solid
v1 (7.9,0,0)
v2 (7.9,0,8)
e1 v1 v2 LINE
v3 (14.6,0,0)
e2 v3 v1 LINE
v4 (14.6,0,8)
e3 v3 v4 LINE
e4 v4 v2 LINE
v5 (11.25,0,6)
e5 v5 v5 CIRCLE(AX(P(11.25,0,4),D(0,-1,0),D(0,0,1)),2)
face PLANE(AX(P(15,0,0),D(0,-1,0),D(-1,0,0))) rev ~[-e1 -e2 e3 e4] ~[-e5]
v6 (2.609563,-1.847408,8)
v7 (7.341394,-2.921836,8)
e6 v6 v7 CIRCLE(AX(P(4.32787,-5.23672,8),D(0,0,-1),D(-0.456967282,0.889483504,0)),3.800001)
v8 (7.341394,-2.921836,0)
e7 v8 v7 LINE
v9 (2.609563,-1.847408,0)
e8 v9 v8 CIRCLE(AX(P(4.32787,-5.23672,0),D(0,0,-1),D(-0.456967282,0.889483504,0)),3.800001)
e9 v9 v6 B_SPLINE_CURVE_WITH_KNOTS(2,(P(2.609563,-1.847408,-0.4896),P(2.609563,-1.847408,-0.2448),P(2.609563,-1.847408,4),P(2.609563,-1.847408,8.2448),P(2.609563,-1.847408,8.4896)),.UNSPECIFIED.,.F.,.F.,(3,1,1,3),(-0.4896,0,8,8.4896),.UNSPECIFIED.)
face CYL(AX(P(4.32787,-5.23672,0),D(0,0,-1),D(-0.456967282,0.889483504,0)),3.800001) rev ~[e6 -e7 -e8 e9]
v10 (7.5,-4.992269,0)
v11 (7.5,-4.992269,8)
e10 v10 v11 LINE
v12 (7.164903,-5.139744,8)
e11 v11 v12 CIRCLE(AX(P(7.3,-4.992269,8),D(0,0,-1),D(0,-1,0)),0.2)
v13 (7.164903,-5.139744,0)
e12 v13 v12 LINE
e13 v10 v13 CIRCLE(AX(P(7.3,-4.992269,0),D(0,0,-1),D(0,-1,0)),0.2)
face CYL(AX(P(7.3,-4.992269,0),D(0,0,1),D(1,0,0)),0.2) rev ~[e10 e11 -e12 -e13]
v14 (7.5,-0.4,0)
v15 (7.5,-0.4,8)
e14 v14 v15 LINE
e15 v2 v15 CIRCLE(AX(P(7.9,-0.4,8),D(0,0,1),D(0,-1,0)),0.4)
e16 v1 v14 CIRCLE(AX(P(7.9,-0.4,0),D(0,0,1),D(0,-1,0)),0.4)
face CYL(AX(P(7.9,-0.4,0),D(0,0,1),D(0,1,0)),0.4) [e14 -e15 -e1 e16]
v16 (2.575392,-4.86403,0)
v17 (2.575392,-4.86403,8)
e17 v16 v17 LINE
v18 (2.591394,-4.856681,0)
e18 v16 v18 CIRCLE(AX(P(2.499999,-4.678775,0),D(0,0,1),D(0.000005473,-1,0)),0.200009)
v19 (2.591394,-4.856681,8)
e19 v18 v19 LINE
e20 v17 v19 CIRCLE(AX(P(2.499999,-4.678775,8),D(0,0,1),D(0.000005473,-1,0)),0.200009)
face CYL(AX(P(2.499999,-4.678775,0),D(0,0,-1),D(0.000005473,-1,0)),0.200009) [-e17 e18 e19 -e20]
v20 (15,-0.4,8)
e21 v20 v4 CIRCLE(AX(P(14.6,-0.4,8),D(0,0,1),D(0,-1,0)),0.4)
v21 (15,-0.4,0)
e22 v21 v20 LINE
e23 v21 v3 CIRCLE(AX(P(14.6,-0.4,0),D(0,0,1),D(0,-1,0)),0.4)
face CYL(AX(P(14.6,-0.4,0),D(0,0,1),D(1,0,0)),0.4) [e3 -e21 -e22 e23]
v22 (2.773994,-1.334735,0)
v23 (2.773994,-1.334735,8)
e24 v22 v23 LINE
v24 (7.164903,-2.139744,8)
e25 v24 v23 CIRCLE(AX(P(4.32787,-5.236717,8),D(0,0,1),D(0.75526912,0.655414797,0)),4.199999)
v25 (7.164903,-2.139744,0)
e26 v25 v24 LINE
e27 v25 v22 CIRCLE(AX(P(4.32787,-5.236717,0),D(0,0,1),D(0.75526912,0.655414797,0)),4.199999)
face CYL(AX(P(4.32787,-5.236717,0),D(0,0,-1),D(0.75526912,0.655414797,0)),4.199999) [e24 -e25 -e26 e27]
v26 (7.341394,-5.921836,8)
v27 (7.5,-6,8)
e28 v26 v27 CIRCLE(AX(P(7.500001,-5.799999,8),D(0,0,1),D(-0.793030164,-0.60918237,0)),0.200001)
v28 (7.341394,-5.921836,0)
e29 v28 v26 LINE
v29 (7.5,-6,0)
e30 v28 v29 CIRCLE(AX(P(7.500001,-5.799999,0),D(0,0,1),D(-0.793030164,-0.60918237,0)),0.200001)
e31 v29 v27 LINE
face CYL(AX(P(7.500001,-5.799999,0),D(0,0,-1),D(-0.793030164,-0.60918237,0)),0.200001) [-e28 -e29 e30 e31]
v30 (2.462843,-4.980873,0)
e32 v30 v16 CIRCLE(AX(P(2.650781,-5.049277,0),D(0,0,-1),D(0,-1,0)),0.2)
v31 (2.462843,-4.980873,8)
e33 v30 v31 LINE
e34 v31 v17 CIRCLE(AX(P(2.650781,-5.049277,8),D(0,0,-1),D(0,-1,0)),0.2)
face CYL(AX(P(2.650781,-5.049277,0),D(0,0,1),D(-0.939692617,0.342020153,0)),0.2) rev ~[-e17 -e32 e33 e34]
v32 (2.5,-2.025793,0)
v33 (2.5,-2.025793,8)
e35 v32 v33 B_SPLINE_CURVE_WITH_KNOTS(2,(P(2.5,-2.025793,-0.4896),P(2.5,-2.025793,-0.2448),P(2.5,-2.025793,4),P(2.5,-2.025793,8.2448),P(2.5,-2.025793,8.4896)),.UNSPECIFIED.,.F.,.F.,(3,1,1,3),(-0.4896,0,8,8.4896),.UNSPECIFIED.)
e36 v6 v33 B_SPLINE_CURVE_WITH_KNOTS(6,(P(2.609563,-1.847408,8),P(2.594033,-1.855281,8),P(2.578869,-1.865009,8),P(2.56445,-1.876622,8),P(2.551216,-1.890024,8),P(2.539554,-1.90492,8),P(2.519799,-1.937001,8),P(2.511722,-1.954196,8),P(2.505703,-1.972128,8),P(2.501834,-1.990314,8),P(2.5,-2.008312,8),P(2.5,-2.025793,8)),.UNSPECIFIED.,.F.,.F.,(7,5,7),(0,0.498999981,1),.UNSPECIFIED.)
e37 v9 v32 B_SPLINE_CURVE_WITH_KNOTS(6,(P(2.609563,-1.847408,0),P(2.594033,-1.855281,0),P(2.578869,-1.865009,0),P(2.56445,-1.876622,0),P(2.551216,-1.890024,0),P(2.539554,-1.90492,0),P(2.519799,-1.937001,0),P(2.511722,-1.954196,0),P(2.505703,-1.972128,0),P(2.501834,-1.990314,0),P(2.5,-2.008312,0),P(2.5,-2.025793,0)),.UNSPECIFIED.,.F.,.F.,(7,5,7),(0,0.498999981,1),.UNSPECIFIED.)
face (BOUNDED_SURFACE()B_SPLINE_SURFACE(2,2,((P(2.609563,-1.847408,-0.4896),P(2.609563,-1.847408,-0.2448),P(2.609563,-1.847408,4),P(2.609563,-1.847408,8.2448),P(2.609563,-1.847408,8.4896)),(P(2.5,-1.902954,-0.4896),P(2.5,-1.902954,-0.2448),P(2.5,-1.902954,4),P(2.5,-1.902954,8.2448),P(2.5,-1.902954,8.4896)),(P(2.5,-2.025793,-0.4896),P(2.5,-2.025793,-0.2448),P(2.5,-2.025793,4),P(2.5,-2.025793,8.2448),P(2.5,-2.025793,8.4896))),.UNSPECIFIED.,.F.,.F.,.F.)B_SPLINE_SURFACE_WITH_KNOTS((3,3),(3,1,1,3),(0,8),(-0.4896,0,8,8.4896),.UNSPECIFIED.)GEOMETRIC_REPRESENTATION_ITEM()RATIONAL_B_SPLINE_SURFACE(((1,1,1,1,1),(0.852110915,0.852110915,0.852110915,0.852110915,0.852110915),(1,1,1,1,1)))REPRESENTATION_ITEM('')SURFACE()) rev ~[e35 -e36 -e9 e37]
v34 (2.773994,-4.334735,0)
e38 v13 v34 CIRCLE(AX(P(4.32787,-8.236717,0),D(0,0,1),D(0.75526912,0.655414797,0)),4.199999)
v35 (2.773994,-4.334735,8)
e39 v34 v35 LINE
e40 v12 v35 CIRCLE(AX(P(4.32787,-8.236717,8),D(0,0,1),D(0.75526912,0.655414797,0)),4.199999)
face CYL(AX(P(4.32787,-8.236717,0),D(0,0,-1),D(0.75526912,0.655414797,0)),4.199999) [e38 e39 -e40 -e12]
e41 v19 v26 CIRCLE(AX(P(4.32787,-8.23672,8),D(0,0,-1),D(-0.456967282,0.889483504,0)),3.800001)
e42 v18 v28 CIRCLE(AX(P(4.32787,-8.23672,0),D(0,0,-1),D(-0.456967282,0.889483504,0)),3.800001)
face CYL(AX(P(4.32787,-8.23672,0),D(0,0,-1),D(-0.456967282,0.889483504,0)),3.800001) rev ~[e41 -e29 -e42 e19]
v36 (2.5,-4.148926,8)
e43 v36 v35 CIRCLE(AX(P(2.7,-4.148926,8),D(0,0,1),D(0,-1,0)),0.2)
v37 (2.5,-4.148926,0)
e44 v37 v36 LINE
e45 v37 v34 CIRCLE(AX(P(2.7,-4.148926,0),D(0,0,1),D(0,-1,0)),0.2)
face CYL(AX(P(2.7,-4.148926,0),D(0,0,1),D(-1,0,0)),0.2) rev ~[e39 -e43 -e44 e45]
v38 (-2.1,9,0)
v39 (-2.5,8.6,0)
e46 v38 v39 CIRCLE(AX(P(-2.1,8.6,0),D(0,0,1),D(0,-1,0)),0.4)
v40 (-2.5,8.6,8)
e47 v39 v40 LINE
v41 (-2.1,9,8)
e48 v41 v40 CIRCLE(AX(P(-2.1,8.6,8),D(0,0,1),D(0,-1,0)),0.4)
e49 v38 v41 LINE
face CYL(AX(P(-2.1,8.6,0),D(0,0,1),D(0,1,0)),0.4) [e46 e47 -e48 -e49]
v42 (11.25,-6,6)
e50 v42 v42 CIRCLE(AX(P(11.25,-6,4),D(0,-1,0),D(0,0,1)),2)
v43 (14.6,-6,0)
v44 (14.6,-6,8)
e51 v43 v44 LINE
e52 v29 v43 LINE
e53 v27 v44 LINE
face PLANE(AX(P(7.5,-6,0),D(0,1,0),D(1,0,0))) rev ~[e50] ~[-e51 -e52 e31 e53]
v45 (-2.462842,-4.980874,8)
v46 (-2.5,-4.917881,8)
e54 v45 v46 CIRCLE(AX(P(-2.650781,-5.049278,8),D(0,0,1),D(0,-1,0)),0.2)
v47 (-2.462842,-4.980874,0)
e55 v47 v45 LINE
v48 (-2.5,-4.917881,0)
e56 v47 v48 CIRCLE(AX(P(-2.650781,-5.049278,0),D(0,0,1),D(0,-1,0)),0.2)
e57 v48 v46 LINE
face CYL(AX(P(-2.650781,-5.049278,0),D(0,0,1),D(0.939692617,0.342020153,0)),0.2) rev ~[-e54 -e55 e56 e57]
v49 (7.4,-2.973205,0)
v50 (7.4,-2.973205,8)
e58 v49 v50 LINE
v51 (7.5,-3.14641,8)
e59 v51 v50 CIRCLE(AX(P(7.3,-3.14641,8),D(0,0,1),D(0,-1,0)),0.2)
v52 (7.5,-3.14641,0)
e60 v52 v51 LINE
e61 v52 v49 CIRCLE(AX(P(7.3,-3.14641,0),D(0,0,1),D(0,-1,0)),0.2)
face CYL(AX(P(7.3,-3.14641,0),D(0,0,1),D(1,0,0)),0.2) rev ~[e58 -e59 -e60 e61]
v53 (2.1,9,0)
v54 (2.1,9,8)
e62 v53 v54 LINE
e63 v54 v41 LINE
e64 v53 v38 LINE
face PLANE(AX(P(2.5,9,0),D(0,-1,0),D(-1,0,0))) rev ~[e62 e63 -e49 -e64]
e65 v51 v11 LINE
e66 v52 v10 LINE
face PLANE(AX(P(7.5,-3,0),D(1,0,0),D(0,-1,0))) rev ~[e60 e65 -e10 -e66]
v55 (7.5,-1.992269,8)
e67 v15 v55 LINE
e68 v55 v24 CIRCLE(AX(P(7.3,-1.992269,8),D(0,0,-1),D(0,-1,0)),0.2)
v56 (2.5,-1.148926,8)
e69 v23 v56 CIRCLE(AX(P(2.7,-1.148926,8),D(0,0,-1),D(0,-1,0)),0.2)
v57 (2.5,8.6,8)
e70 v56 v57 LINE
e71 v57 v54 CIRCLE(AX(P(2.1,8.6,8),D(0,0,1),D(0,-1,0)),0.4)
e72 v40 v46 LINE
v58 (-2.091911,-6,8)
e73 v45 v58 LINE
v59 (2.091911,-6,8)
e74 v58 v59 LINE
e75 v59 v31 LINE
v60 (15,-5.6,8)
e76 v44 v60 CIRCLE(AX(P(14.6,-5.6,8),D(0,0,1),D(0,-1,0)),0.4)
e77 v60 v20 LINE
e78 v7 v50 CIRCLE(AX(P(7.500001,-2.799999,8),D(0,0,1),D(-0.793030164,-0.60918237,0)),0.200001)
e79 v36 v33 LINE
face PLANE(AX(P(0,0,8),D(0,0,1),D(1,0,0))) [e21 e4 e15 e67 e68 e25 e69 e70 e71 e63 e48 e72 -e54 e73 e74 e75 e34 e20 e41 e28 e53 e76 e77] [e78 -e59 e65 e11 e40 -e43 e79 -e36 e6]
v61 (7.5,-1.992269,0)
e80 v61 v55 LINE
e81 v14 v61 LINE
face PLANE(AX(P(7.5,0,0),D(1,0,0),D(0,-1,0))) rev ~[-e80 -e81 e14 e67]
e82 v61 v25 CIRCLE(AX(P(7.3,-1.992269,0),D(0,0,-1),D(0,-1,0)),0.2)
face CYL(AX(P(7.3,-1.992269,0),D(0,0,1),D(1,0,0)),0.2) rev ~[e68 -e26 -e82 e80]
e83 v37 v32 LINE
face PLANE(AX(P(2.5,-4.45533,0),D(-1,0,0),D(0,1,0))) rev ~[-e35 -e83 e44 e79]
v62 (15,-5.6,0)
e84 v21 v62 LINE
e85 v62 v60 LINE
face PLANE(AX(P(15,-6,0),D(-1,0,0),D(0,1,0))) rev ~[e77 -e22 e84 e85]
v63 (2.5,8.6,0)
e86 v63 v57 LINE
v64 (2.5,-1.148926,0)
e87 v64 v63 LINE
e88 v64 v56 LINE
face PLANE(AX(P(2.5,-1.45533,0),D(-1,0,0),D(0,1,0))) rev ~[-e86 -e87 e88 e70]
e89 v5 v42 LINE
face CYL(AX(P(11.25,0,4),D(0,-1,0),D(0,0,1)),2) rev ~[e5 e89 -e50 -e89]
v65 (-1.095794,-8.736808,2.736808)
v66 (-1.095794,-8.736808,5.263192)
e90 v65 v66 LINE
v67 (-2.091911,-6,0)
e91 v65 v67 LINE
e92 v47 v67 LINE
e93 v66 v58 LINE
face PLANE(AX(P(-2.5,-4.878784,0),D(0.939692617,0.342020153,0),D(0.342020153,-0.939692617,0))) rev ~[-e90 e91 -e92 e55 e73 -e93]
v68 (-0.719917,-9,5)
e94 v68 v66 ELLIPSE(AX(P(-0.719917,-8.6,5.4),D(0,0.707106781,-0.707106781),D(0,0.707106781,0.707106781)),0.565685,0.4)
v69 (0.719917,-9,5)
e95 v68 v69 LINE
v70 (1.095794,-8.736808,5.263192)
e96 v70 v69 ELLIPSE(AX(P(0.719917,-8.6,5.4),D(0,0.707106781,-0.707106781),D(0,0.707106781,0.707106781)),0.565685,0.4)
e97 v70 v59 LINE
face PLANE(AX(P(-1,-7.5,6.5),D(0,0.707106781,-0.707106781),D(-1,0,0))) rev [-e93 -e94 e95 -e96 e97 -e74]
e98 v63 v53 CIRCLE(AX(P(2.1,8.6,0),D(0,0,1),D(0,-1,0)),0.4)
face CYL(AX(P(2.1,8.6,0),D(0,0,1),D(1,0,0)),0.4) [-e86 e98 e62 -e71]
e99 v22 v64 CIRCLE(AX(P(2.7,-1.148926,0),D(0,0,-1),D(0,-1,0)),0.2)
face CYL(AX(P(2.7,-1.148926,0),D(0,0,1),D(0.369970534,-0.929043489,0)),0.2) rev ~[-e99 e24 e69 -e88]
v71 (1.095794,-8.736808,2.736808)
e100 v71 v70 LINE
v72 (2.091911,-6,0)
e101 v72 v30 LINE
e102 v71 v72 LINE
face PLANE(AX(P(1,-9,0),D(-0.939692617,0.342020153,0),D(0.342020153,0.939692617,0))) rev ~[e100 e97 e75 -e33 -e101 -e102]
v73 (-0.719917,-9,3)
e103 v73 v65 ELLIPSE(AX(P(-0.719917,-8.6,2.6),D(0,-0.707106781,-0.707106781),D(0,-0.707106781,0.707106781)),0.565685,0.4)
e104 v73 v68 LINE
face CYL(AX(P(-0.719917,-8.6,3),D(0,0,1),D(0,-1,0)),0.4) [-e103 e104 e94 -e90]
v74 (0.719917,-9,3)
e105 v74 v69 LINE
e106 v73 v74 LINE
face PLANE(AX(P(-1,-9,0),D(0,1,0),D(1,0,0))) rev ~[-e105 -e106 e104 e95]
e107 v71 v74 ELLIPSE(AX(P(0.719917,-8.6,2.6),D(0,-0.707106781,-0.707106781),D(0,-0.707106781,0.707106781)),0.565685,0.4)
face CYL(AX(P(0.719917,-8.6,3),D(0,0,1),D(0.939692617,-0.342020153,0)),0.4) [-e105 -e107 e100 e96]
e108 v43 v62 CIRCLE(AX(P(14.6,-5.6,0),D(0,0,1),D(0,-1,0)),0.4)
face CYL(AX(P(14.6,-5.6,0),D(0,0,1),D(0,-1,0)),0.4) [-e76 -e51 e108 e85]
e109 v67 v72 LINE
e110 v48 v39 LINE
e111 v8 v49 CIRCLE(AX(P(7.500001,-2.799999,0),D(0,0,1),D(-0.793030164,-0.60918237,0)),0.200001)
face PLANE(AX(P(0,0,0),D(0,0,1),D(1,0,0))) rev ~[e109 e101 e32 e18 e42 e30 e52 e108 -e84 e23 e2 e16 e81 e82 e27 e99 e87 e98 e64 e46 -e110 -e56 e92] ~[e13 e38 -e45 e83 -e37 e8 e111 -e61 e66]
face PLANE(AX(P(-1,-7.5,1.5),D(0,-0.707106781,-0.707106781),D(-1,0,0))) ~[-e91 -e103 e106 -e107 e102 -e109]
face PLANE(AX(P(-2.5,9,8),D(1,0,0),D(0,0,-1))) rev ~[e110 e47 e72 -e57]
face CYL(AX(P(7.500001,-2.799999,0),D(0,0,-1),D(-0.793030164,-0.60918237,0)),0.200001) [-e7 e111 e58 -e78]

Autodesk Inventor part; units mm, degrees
ref_plane "YZ Plane" through (0, 0, 0) normal (1, 0, 0) x (0, 1, 0)
ref_plane "XZ Plane" through (0, 0, 0) normal (0, 1, 0) x (-1, 0, 0)
ref_plane "XY Plane" through (0, 0, 0) normal (0, 0, 1) x (1, 0, 0)
sketch "Sketch1" plane through (0, 0, 0) normal (0, 0, 1) x (1, 0, 0)
  line L0 (-2.5, 9) -> (2.5, 9)
  line L1 (2.5, 9) -> (2.5, -9)
  line L2 (2.5, -9) -> (-2.5, -9)
  line L3 (-2.5, -9) -> (-2.5, 9)
  line L4 (-2.5, 9) -> (2.5, -9) construction
  line L5 (2.5, 9) -> (-2.5, -9) construction
  line L6 (-15, 0) -> (-7.5, 0)
  line L7 (-7.5, 0) -> (-7.5, -3)
  line L8 (-7.5, -3) -> (-15, -3)
  line L9 (-15, -3) -> (-15, 0)
  line L10 (7.5, 0) -> (15, 0)
  line L11 (15, 0) -> (15, -3)
  line L12 (15, -3) -> (7.5, -3)
  line L13 (7.5, -3) -> (7.5, 0)
  line L14 (7.5, -3) -> (7.5, -6)
  line L15 (7.5, -6) -> (15, -6)
  line L16 (15, -6) -> (15, -3)
  line L17 (-7.5, -3) -> (-7.5, -6)
  line L18 (-7.5, -6) -> (-15, -6)
  line L19 (-15, -6) -> (-15, -3)
  line L20 (-7.5, -1.5) -> (7.5, -1.5) construction
  line L21 (-1, -9) -> (-2.5, -4.878784)
  line L22 (1, -9) -> (2.5, -4.878784)
  arc A0 (-2.5, -4.678784) -> (-7.5, -5.8) centre (-4.32787, -8.236717) ccw construction
  arc A1 (-2.408606, -4.500887) -> (-7.658606, -5.678164) centre (-4.32787, -8.236717) ccw
  arc A2 (-2.591394, -4.856681) -> (-7.341394, -5.921836) centre (-4.32787, -8.236717) ccw
  arc A3 (-2.591394, -4.856681) -> (-2.408606, -4.500887) centre (-2.5, -4.678784) ccw
  arc A4 (-7.658606, -5.678164) -> (-7.341394, -5.921836) centre (-7.5, -5.8) ccw
  arc A5 (7.5, -5.8) -> (2.5, -4.678784) centre (4.32787, -8.236717) ccw construction
  arc A6 (7.658606, -5.678164) -> (2.408606, -4.500887) centre (4.32787, -8.236717) ccw
  arc A7 (7.341394, -5.921836) -> (2.591394, -4.856681) centre (4.32787, -8.236717) ccw
  arc A8 (7.341394, -5.921836) -> (7.658606, -5.678164) centre (7.5, -5.8) ccw
  arc A9 (2.408606, -4.500887) -> (2.591394, -4.856681) centre (2.5, -4.678784) ccw
  arc A10 (-2.5, -1.678784) -> (-7.5, -2.8) centre (-4.32787, -5.236717) ccw construction
  arc A11 (-2.408606, -1.500887) -> (-7.658606, -2.678164) centre (-4.32787, -5.236717) ccw
  arc A12 (-2.591394, -1.856681) -> (-7.341394, -2.921836) centre (-4.32787, -5.236717) ccw
  arc A13 (-2.591394, -1.856681) -> (-2.408606, -1.500887) centre (-2.5, -1.678784) ccw
  arc A14 (-7.658606, -2.678164) -> (-7.341394, -2.921836) centre (-7.5, -2.8) ccw
  arc A15 (7.5, -2.8) -> (2.5, -1.678784) centre (4.32787, -5.236717) ccw construction
  arc A16 (7.658606, -2.678164) -> (2.408606, -1.500887) centre (4.32787, -5.236717) ccw
  arc A17 (7.341394, -2.921836) -> (2.591394, -1.856681) centre (4.32787, -5.236717) ccw
  arc A18 (7.341394, -2.921836) -> (7.658606, -2.678164) centre (7.5, -2.8) ccw
  arc A19 (2.408606, -1.500887) -> (2.591394, -1.856681) centre (2.5, -1.678784) ccw
  point P0 (0, 0)
  point P1 (0, -1.5)
  point P2 (-7.5, -5.483975)
  point P3 (-2.5, -1.878784)
  point P4 (-2.5, -4.45533)
  point P5 (7.5, -5.483975)
  point P6 (2.5, -4.45533)
  point P7 (2.5, -1.878784)
  point P8 (7.5, -2.483975)
  point P9 (2.5, -1.45533)
  point P10 (-2.5, -1.45533)
  point P11 (-7.5, -2.483975)
  dimension "d0" = 5
  dimension "d1" = 18
  dimension "d2" = 30
  dimension "d3" = 3
  dimension "d4" = 3
  dimension "d5" = 5
  dimension "d8" = 9
  dimension "d9" = 3
  dimension "d10" = 2
  dimension "d11" = 20
  dimension "d12" = 0.4
  dimension "d13" = 4
  dimension "d14" = 3
sketch "Sketch1 outline for Extrusion1" plane through (0, 0, 0) normal (0, 0, 1) x (1, 0, 0)
  arc A0 (-7.5, -6) -> (-7.341394, -5.921836) centre (-7.5, -5.8) ccw
  line L0 (-15, -6) -> (-7.5, -6)
  arc A1 (-7.341394, -5.921836) -> (-2.591394, -4.856681) centre (-4.32787, -8.236717) cw
  line L1 (-15, -3) -> (-15, -6)
  arc A2 (-2.591394, -4.856681) -> (-2.5, -4.878784) centre (-2.5, -4.678784) ccw
  line L2 (-15, 0) -> (-15, -3)
  line L3 (-2.5, -4.878784) -> (-1, -9)
  line L4 (-7.5, 0) -> (-15, 0)
  line L5 (-1, -9) -> (1, -9)
  line L6 (-7.5, -2.483975) -> (-7.5, 0)
  line L7 (1, -9) -> (2.5, -4.878784)
  arc A3 (-2.5, -1.45533) -> (-7.5, -2.483975) centre (-4.32787, -5.236717) ccw
  arc A4 (2.5, -4.878784) -> (2.591394, -4.856681) centre (2.5, -4.678784) ccw
  line L8 (-2.5, 9) -> (-2.5, -1.45533)
  arc A5 (2.591394, -4.856681) -> (7.341394, -5.921836) centre (4.32787, -8.236717) cw
  line L9 (2.5, 9) -> (-2.5, 9)
  arc A6 (7.341394, -5.921836) -> (7.5, -6) centre (7.5, -5.8) ccw
  line L10 (2.5, -1.45533) -> (2.5, 9)
  line L11 (7.5, -6) -> (15, -6)
  arc A7 (7.5, -2.483975) -> (2.5, -1.45533) centre (4.32787, -5.236717) ccw
  line L12 (15, -6) -> (15, -3)
  line L13 (7.5, 0) -> (7.5, -2.483975)
  line L14 (15, -3) -> (15, 0)
  line L15 (15, 0) -> (7.5, 0)
  line L16 (-7.5, -5.483975) -> (-7.5, -3)
  arc A8 (-2.5, -4.45533) -> (-7.5, -5.483975) centre (-4.32787, -8.236717) ccw
  line L17 (-2.5, -1.878784) -> (-2.5, -4.45533)
  arc A9 (-2.591394, -1.856681) -> (-2.5, -1.878784) centre (-2.5, -1.678784) ccw
  arc A10 (-7.341394, -2.921836) -> (-2.591394, -1.856681) centre (-4.32787, -5.236717) cw
  arc A11 (-7.5, -3) -> (-7.341394, -2.921836) centre (-7.5, -2.8) ccw
  arc A12 (7.5, -5.483975) -> (2.5, -4.45533) centre (4.32787, -8.236717) ccw
  line L18 (7.5, -3) -> (7.5, -5.483975)
  arc A13 (7.341394, -2.921836) -> (7.5, -3) centre (7.5, -2.8) ccw
  arc A14 (2.591394, -1.856681) -> (7.341394, -2.921836) centre (4.32787, -5.236717) cw
  arc A15 (2.5, -1.878784) -> (2.591394, -1.856681) centre (2.5, -1.678784) ccw
  line L19 (2.5, -4.45533) -> (2.5, -1.878784)
extrude "Extrusion1" add sketch "Sketch1 outline for Extrusion1" along normal blind 8
chamfer "Chamfer1" distance 3 angle 45 1 edges at (0, -9, 0) measured on face at (-0.3333, -9, 2.6667)
chamfer "Chamfer2" distance 3 angle 45 1 edges at (0, -9, 8) measured on face at (-0.3333, -9, 4.6667)
fillet "Fillet1" radius 0.2 14 edges at (-7.5, -2.484, 4) (-7.5, -3, 4) (-7.5, -5.484, 4) (-2.5, -4.8788, 4) (-2.5, -4.4553, 4) (-2.5, -1.8788, 4) (-2.5, -1.4553, 4) (2.5, -1.4553, 4) (2.5, -1.8788, 4) (2.5, -4.4553, 4) (2.5, -4.8788, 4) (7.5, -5.484, 4) (7.5, -3, 4) (7.5, -2.484, 4)
fillet "Fillet2" radius 0.4 12 edges at (-15, 0, 4) (-15, -3, 4) (15, -3, 4) (15, 0, 4) (7.5, 0, 4) (15, -6, 4) (-15, -6, 4) (-7.5, 0, 4) (-2.5, 9, 4) (2.5, 9, 4) (-1, -9, 4) (1, -9, 4)
sketch "Sketch3" plane through (-14.6, 0, 0) normal (0, 1, 0) x (1, 0, 0)
  line L0 (3.35, -4) -> (25.85, -4) construction
  line L1 (16.7, 0) -> (12.5, 0) projected
  line L2 (29.2, 0) -> (29.2, -8) projected
  line L3 (6.7, -8) -> (0, -8) projected
  point P0 (14.6, 0)
  point P1 (14.6, -4)
  point P2 (14.6, 0)
  point P3 (29.2, -4)
  point P4 (3.35, -8)
hole "Hole2" at (-11.25, 0, 4) at (11.25, 0, 4) direction (0, -1, 0) diameter 4 end through all
sketch "Sketch4" plane through (-2.1, 9, 0) normal (0, 1, 0) x (1, 0, 0)
  line L0 (-12.9, 0) -> (-0.4, 0)
  line L1 (-0.4, 0) -> (-0.4, -8)
  line L2 (-0.4, -8) -> (-12.9, -8)
  line L3 (-12.9, -8) -> (-12.9, 0)
  line L4 (-5.8, -8) -> (-12.5, -8) projected
  line L5 (-5.8, 0) -> (-12.5, 0) projected
  line L6 (-12.9, 0) -> (-12.9, -8) projected
  line L7 (-0.4, 0) -> (-0.4, -8) projected
  point P0 (2.1, 0)
sketch "Sketch4 outline for Extrusion2" plane through (-2.1, 9, 0) normal (0, 1, 0) x (1, 0, 0)
  line L0 (-12.9, 0) -> (-12.9, -8)
  line L1 (-0.4, 0) -> (-12.9, 0)
  line L2 (-0.4, -8) -> (-0.4, 0)
  line L3 (-12.9, -8) -> (-0.4, -8)
extrude "Extrusion2" cut sketch "Sketch4 outline for Extrusion2" against normal through all
equation "\"d4\" = d3"
properties part number "Actuator 2"
